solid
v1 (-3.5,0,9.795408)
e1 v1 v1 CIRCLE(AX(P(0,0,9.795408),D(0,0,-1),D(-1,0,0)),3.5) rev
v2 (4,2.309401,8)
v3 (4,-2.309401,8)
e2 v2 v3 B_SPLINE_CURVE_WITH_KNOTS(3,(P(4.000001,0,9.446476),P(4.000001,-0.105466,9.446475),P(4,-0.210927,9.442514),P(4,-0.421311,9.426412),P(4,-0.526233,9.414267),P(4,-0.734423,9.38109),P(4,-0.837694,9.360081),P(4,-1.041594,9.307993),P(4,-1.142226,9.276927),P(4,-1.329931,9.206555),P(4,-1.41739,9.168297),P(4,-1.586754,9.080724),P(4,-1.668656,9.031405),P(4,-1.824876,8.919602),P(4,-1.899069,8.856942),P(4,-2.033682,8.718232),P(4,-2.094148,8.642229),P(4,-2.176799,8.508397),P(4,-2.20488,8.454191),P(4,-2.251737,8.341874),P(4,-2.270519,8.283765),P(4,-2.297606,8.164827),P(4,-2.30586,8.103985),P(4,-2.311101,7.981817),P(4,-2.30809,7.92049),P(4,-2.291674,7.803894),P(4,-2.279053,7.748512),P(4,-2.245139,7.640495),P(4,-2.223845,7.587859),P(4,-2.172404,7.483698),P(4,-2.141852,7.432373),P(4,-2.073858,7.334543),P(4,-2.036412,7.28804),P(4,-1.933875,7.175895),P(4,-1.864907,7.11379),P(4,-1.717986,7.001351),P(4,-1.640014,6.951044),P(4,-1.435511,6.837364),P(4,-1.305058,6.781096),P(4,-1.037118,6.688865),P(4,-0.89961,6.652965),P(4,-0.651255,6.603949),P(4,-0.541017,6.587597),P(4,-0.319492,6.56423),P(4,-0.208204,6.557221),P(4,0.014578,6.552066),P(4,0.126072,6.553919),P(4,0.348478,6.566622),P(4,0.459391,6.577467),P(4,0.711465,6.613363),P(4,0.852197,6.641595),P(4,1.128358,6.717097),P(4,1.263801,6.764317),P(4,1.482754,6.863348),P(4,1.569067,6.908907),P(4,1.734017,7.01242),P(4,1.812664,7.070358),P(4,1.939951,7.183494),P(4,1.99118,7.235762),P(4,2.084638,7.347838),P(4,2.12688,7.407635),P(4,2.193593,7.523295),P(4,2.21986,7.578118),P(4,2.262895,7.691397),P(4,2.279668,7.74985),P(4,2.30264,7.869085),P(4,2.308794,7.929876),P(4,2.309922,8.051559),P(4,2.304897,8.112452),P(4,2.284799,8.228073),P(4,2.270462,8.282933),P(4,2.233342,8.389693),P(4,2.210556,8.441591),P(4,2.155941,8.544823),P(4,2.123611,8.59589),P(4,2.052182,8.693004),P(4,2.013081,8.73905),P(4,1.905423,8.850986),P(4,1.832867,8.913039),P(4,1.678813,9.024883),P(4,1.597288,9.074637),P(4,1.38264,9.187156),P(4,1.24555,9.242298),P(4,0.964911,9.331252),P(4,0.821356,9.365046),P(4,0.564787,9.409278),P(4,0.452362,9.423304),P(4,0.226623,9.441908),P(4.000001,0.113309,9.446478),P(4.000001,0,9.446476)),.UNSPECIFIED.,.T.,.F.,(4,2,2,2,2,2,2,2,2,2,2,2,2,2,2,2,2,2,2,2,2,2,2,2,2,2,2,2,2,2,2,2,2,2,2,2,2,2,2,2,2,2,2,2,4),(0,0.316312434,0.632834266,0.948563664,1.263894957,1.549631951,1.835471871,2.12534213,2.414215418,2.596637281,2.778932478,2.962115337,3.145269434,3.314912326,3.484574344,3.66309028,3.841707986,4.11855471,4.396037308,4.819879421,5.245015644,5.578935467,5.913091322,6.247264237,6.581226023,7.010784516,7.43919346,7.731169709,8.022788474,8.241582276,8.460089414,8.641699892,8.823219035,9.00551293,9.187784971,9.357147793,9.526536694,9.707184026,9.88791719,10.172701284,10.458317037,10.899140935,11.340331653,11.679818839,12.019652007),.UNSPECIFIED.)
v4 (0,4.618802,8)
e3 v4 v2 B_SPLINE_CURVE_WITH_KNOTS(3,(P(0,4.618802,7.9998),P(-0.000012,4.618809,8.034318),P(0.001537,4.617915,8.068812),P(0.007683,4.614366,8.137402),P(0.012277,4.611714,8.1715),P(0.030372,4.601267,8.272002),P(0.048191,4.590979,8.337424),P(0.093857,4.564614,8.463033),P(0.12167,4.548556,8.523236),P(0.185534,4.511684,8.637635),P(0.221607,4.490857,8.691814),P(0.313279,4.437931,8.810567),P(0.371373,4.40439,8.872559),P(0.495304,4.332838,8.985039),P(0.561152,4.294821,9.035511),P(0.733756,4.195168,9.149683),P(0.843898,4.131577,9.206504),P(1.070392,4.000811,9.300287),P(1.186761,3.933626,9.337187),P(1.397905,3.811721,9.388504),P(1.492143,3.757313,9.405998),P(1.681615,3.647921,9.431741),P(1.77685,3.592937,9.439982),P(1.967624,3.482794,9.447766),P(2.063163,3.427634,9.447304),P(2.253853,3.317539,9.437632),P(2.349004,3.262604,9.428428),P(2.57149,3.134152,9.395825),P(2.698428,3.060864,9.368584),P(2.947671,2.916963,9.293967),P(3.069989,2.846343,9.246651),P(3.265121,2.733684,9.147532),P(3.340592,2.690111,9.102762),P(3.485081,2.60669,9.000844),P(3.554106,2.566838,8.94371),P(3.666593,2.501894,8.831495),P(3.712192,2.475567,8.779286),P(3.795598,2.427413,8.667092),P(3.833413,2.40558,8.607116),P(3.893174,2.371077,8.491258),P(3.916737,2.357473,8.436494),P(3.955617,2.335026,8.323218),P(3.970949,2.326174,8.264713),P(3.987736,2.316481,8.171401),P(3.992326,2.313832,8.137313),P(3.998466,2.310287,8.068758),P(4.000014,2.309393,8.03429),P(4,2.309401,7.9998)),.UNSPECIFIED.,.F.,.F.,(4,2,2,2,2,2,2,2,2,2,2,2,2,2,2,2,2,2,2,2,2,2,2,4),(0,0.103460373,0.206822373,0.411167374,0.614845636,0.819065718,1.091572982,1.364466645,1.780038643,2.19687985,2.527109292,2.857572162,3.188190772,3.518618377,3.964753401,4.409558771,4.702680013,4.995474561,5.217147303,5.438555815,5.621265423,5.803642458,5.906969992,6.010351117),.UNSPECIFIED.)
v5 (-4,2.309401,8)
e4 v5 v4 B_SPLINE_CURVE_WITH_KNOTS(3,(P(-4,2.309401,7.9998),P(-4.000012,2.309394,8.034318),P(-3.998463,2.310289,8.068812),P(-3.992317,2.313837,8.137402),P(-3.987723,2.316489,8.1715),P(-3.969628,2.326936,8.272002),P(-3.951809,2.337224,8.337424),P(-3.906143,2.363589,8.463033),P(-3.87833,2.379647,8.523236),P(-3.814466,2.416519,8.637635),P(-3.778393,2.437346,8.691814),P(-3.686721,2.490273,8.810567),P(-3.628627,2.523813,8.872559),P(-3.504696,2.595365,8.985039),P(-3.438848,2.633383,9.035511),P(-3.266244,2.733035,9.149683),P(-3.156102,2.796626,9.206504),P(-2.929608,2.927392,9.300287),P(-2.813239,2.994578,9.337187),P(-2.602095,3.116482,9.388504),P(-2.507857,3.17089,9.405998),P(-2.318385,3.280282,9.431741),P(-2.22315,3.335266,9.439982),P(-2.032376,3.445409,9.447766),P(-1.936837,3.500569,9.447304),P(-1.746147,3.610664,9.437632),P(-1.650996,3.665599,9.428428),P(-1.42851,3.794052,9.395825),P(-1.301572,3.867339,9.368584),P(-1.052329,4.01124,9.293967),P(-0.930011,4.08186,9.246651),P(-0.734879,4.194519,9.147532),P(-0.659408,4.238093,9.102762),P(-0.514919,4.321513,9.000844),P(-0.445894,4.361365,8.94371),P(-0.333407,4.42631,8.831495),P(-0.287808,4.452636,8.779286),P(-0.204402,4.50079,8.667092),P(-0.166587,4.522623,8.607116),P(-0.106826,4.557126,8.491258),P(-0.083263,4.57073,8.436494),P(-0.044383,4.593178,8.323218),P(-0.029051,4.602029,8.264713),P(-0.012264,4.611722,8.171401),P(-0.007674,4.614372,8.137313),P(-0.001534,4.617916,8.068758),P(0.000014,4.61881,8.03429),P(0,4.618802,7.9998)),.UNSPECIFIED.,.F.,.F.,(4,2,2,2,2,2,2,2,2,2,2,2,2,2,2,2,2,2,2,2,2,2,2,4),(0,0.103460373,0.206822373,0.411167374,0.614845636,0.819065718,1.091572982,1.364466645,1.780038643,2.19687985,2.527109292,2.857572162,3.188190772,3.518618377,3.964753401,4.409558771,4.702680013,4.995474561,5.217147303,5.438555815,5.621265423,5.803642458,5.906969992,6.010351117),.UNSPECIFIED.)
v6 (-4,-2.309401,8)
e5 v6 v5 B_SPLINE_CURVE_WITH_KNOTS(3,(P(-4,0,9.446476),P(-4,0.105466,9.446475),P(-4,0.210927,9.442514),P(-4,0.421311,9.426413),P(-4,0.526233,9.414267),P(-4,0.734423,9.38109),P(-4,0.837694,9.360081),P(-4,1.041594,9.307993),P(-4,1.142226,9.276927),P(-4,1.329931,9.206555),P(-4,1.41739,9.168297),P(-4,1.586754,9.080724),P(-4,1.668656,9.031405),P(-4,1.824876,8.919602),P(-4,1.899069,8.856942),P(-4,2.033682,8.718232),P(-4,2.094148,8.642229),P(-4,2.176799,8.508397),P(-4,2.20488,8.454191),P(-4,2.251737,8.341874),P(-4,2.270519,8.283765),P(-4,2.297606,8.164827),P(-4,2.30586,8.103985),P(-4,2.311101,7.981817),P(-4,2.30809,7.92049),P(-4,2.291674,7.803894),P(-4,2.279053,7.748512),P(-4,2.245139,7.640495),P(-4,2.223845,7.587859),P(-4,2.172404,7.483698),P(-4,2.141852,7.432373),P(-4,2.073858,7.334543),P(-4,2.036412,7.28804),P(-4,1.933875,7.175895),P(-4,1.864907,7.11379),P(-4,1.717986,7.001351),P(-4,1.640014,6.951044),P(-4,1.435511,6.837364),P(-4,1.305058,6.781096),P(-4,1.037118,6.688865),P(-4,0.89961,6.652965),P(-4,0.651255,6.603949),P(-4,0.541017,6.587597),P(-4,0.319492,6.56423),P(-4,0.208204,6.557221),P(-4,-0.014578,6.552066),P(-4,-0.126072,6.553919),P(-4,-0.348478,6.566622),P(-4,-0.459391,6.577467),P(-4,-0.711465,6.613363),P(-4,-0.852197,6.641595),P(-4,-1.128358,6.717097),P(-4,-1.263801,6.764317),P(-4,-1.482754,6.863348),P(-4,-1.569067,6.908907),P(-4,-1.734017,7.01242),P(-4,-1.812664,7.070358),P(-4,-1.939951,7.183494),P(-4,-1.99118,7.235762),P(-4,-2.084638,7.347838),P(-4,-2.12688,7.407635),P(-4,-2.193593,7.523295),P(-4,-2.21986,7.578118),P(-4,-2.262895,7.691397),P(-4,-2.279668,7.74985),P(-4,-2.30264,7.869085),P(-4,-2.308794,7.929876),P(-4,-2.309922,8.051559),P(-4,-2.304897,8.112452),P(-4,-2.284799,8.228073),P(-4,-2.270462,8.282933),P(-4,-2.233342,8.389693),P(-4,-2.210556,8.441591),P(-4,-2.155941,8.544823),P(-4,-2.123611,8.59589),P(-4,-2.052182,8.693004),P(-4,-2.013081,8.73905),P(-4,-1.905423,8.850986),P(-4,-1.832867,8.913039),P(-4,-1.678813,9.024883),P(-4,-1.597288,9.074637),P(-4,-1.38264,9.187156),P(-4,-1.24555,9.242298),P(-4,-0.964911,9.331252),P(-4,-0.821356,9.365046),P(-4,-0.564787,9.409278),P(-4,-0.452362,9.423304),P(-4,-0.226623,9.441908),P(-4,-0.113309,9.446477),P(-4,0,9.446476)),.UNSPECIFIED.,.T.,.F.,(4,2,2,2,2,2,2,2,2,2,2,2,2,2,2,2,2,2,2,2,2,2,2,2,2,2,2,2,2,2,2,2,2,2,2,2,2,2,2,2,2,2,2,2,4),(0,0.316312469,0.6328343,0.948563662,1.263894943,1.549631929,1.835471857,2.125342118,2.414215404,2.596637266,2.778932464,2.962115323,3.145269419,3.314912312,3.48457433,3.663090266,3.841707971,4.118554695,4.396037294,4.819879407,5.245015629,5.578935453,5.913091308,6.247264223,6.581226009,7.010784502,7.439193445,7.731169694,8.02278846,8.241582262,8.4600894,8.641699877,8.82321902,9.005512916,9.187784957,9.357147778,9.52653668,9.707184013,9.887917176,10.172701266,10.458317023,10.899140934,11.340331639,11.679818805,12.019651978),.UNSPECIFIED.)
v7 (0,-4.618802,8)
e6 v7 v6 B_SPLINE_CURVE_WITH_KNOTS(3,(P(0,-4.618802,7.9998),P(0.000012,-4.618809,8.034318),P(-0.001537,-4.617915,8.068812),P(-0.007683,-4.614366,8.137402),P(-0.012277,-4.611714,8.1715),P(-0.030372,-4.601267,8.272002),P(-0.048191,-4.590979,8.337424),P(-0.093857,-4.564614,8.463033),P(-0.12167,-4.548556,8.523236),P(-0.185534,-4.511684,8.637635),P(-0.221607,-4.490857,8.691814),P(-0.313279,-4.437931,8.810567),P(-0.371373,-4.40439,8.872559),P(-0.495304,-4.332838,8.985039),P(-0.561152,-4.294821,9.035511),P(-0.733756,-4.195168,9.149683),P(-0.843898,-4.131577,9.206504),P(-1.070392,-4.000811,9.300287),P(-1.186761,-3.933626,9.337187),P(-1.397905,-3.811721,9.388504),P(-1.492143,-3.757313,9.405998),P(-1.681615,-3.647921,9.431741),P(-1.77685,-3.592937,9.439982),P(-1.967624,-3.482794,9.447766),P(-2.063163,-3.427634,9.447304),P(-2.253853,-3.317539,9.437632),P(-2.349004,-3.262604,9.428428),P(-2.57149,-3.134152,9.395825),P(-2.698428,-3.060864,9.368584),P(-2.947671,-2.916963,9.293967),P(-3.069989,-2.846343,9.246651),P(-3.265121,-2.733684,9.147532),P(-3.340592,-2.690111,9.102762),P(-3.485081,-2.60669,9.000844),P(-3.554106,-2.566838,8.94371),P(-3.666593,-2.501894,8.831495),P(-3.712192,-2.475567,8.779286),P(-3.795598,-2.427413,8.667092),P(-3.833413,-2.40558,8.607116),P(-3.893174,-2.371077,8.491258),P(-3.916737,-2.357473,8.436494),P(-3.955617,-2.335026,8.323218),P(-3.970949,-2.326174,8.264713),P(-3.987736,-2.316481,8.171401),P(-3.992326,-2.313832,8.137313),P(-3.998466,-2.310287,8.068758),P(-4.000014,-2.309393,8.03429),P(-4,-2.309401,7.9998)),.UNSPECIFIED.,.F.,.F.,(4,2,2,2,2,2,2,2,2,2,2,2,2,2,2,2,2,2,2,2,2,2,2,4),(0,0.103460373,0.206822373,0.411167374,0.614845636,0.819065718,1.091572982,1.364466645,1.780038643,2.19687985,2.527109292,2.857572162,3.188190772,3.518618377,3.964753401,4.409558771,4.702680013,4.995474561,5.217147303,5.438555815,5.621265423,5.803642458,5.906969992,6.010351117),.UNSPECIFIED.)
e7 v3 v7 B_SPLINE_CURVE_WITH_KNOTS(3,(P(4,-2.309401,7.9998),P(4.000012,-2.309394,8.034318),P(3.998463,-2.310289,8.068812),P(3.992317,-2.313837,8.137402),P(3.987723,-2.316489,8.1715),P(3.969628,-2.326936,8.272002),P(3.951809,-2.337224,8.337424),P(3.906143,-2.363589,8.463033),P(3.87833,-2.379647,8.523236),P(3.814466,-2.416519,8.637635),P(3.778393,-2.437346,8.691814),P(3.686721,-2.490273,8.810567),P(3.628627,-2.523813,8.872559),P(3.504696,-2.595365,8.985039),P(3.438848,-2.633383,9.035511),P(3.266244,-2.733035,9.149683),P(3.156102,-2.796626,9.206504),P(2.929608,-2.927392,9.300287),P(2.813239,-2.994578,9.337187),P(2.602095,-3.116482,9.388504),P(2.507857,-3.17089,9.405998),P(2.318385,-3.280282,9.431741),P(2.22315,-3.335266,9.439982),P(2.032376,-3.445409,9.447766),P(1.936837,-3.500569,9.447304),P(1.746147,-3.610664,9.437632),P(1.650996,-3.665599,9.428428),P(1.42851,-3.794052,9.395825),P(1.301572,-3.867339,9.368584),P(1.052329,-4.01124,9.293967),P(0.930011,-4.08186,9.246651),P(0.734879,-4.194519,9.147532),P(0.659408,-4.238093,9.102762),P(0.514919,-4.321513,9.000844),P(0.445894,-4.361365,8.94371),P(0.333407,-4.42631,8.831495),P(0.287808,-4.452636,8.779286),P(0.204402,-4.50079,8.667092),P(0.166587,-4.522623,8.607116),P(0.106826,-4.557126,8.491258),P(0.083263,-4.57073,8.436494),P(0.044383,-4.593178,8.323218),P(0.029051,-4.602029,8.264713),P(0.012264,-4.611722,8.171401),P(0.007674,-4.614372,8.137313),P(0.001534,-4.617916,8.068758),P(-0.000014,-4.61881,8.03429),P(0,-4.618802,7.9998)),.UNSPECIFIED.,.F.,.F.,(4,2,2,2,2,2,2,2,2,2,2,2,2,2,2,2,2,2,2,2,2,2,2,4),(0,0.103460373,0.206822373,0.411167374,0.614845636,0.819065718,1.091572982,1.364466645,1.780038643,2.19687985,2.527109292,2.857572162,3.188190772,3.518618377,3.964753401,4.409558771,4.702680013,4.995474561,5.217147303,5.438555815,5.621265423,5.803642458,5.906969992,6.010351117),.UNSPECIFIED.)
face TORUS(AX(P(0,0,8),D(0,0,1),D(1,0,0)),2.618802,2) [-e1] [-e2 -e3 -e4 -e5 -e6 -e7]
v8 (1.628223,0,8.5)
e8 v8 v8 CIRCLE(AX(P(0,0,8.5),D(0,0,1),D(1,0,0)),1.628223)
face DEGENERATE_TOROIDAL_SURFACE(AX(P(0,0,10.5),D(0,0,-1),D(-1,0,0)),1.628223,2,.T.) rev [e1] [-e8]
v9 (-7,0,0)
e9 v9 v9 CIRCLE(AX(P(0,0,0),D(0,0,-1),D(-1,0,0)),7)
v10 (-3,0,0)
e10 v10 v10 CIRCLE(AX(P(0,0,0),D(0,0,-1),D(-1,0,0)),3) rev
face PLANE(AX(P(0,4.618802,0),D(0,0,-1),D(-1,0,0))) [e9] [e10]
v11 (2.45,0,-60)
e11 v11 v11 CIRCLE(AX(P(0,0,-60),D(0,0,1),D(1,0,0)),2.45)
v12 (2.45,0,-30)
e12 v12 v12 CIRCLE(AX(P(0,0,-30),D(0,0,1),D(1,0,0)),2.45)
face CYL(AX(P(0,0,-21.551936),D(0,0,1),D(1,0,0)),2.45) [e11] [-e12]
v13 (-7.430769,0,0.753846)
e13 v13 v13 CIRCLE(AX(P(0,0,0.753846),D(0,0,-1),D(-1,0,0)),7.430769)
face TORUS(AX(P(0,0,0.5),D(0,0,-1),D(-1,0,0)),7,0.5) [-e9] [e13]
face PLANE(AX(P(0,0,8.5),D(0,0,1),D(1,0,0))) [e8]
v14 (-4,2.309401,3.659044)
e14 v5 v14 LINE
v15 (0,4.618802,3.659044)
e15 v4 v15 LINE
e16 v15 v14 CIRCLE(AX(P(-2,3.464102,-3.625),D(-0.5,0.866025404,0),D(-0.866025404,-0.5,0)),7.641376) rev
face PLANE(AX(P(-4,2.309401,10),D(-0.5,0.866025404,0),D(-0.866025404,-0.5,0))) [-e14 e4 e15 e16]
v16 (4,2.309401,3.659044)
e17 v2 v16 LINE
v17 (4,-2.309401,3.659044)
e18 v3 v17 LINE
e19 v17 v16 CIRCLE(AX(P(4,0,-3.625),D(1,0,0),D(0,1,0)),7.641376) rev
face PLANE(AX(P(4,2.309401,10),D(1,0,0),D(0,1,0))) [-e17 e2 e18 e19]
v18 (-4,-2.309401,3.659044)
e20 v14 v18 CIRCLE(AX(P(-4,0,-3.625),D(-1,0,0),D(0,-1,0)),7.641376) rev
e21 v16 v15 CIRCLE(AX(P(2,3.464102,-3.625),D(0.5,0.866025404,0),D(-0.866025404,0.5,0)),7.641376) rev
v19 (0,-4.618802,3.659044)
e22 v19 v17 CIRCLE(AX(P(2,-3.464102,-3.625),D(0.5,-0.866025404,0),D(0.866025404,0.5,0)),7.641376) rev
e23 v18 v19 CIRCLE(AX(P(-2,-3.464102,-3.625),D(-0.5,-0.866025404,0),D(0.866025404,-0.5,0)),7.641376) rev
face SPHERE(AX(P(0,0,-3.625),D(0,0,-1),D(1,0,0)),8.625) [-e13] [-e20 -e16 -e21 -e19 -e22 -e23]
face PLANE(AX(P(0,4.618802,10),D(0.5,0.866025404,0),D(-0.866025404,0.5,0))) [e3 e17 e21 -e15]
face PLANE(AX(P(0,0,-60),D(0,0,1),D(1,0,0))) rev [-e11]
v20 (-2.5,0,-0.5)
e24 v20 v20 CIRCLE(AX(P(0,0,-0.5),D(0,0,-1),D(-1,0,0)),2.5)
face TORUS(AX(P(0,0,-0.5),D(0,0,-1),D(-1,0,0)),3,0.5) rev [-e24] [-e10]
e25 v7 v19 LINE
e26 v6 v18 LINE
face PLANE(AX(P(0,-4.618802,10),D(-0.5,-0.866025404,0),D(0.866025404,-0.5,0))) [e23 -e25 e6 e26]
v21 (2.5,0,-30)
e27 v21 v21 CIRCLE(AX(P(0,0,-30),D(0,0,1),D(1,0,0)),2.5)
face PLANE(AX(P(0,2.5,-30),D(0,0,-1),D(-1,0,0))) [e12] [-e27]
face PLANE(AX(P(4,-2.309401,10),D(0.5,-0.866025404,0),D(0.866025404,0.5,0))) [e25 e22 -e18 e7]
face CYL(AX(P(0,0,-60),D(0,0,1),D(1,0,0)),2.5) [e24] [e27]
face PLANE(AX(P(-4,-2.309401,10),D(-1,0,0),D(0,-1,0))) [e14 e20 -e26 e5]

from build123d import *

# Parameters (mm, degrees)
HEAD_DEPTH     = 10
SHANK_SKETCH_R = 2.5
SHANK_DEPTH    = 60
SKETCH6_R      = 3.5
HEAD_CUT_DEPTH = 1.5
FILLET1_R      = 2
FILLET2_R      = 0.5
THREAD_END_W   = 30
THREAD_END_H   = 0.05


with BuildPart() as part:
    # Head Sketch → Head (new body)
    with BuildSketch(Plane.XY):
        Polygon((0, 4.618802154), (4, 2.309401077), (4, -2.309401077), (0, -4.618802154), (-4, -2.309401077), (-4, 2.309401077), align=None)
    extrude(amount=HEAD_DEPTH)

    # Shank Sketch → Shank (add)
    with BuildSketch(Plane.XY):
        Circle(SHANK_SKETCH_R)
    extrude(amount=-SHANK_DEPTH)

    # Sketch3 → Flange (revolve)
    with BuildSketch(Plane(origin=(0, 0, 0), x_dir=(-1, 0, 0), z_dir=(0, 1, 0)), mode=Mode.PRIVATE) as flange_sk:
        with BuildLine():
            Line((-7, 0), (0, 0))
            Line((0, 0), (0, 5))
            ThreePointArc((0, 5), (-4.279198343, 3.863597101), (-7.430769231, 0.753846154))
            ThreePointArc((-7.430769231, 0.753846154), (-7.434121571, 0.251930531), (-7, 0))
        make_face()
    revolve(flange_sk.sketch.rotate(Axis((0, 0, 0), (0, 0, 1)), 30), axis=Axis((0, 0, 0), (0, 0, 1)))

    # Sketch5 → Head Trim (revolve, cut)
    with BuildSketch(Plane(origin=(0, 0, 0), x_dir=(0, 0, -1), z_dir=(1, 0, 0)), mode=Mode.PRIVATE) as head_trim_sk:
        with BuildLine():
            Line((-10, -2.618802154), (-10, -4.618802154))
            Line((-10, -4.618802154), (-8, -4.618802154))
            ThreePointArc((-8, -4.618802154), (-9.414213562, -4.033015716), (-10, -2.618802154))
        make_face()
    revolve(head_trim_sk.sketch.rotate(Axis((0, 0, 15.085599173), (0, 0, -1)), 90), axis=Axis((0, 0, 15.085599173), (0, 0, -1)), mode=Mode.SUBTRACT)

    # Sketch6 → Head Cut (cut)
    with BuildSketch(Plane.XY.offset(10)):
        Circle(SKETCH6_R)
    extrude(amount=-HEAD_CUT_DEPTH, mode=Mode.SUBTRACT)

    # Fillet1
    # the kernel refuses this fillet: 2 mm, written as the material it adds along each edge
    with BuildSketch(Plane(origin=(0, 0, 8.5), x_dir=(1, 0, 0), z_dir=(0, -1, 0))) as fillet1_piece_1:
        with BuildLine():
            CenterArc((1.62822269, 2), FILLET1_R, 270, 69.372190804)
            Line((1.62822269, 0), (3.5, 0))
            Line((3.5, 0), (3.5, 1.295408131))
        make_face()
    revolve(axis=Axis((0, 0, 8.5), (0, 0, 1)), revolution_arc=180.000001341)
    with BuildSketch(Plane(origin=(0, 0, 8.5), x_dir=(-0.9999999999999998, -2.340668935307113e-08, 0), z_dir=(-2.340668935307113e-08, 0.9999999999999998, 0))) as fillet1_piece_2:
        with BuildLine():
            CenterArc((1.62822269, 2), FILLET1_R, 270, 69.372190804)
            Line((1.62822269, 0), (3.5, 0))
            Line((3.5, 0), (3.5, 1.295408131))
        make_face()
    revolve(axis=Axis((0, 0, 8.5), (0, 0, 1)), revolution_arc=179.999998659)

    # Fillet2
    fillet2_edges = [part.edges().sort_by_distance(p)[0] for p in [
        (-2.5, 0, 0),
    ]]
    fillet(fillet2_edges, radius=FILLET2_R)

    # Thread End → Thread Cut (revolve, cut)
    with BuildSketch(Plane(origin=(0, 0, 0), x_dir=(0, 0, -1), z_dir=(1, 0, 0)), mode=Mode.PRIVATE) as thread_cut_sk:
        with Locations((45, 2.475)):
            Rectangle(THREAD_END_W, THREAD_END_H)
    revolve(thread_cut_sk.sketch.rotate(Axis((0, 0, -21.551935625), (0, 0, -1)), 270), axis=Axis((0, 0, -21.551935625), (0, 0, -1)), mode=Mode.SUBTRACT)


solid = part.part
